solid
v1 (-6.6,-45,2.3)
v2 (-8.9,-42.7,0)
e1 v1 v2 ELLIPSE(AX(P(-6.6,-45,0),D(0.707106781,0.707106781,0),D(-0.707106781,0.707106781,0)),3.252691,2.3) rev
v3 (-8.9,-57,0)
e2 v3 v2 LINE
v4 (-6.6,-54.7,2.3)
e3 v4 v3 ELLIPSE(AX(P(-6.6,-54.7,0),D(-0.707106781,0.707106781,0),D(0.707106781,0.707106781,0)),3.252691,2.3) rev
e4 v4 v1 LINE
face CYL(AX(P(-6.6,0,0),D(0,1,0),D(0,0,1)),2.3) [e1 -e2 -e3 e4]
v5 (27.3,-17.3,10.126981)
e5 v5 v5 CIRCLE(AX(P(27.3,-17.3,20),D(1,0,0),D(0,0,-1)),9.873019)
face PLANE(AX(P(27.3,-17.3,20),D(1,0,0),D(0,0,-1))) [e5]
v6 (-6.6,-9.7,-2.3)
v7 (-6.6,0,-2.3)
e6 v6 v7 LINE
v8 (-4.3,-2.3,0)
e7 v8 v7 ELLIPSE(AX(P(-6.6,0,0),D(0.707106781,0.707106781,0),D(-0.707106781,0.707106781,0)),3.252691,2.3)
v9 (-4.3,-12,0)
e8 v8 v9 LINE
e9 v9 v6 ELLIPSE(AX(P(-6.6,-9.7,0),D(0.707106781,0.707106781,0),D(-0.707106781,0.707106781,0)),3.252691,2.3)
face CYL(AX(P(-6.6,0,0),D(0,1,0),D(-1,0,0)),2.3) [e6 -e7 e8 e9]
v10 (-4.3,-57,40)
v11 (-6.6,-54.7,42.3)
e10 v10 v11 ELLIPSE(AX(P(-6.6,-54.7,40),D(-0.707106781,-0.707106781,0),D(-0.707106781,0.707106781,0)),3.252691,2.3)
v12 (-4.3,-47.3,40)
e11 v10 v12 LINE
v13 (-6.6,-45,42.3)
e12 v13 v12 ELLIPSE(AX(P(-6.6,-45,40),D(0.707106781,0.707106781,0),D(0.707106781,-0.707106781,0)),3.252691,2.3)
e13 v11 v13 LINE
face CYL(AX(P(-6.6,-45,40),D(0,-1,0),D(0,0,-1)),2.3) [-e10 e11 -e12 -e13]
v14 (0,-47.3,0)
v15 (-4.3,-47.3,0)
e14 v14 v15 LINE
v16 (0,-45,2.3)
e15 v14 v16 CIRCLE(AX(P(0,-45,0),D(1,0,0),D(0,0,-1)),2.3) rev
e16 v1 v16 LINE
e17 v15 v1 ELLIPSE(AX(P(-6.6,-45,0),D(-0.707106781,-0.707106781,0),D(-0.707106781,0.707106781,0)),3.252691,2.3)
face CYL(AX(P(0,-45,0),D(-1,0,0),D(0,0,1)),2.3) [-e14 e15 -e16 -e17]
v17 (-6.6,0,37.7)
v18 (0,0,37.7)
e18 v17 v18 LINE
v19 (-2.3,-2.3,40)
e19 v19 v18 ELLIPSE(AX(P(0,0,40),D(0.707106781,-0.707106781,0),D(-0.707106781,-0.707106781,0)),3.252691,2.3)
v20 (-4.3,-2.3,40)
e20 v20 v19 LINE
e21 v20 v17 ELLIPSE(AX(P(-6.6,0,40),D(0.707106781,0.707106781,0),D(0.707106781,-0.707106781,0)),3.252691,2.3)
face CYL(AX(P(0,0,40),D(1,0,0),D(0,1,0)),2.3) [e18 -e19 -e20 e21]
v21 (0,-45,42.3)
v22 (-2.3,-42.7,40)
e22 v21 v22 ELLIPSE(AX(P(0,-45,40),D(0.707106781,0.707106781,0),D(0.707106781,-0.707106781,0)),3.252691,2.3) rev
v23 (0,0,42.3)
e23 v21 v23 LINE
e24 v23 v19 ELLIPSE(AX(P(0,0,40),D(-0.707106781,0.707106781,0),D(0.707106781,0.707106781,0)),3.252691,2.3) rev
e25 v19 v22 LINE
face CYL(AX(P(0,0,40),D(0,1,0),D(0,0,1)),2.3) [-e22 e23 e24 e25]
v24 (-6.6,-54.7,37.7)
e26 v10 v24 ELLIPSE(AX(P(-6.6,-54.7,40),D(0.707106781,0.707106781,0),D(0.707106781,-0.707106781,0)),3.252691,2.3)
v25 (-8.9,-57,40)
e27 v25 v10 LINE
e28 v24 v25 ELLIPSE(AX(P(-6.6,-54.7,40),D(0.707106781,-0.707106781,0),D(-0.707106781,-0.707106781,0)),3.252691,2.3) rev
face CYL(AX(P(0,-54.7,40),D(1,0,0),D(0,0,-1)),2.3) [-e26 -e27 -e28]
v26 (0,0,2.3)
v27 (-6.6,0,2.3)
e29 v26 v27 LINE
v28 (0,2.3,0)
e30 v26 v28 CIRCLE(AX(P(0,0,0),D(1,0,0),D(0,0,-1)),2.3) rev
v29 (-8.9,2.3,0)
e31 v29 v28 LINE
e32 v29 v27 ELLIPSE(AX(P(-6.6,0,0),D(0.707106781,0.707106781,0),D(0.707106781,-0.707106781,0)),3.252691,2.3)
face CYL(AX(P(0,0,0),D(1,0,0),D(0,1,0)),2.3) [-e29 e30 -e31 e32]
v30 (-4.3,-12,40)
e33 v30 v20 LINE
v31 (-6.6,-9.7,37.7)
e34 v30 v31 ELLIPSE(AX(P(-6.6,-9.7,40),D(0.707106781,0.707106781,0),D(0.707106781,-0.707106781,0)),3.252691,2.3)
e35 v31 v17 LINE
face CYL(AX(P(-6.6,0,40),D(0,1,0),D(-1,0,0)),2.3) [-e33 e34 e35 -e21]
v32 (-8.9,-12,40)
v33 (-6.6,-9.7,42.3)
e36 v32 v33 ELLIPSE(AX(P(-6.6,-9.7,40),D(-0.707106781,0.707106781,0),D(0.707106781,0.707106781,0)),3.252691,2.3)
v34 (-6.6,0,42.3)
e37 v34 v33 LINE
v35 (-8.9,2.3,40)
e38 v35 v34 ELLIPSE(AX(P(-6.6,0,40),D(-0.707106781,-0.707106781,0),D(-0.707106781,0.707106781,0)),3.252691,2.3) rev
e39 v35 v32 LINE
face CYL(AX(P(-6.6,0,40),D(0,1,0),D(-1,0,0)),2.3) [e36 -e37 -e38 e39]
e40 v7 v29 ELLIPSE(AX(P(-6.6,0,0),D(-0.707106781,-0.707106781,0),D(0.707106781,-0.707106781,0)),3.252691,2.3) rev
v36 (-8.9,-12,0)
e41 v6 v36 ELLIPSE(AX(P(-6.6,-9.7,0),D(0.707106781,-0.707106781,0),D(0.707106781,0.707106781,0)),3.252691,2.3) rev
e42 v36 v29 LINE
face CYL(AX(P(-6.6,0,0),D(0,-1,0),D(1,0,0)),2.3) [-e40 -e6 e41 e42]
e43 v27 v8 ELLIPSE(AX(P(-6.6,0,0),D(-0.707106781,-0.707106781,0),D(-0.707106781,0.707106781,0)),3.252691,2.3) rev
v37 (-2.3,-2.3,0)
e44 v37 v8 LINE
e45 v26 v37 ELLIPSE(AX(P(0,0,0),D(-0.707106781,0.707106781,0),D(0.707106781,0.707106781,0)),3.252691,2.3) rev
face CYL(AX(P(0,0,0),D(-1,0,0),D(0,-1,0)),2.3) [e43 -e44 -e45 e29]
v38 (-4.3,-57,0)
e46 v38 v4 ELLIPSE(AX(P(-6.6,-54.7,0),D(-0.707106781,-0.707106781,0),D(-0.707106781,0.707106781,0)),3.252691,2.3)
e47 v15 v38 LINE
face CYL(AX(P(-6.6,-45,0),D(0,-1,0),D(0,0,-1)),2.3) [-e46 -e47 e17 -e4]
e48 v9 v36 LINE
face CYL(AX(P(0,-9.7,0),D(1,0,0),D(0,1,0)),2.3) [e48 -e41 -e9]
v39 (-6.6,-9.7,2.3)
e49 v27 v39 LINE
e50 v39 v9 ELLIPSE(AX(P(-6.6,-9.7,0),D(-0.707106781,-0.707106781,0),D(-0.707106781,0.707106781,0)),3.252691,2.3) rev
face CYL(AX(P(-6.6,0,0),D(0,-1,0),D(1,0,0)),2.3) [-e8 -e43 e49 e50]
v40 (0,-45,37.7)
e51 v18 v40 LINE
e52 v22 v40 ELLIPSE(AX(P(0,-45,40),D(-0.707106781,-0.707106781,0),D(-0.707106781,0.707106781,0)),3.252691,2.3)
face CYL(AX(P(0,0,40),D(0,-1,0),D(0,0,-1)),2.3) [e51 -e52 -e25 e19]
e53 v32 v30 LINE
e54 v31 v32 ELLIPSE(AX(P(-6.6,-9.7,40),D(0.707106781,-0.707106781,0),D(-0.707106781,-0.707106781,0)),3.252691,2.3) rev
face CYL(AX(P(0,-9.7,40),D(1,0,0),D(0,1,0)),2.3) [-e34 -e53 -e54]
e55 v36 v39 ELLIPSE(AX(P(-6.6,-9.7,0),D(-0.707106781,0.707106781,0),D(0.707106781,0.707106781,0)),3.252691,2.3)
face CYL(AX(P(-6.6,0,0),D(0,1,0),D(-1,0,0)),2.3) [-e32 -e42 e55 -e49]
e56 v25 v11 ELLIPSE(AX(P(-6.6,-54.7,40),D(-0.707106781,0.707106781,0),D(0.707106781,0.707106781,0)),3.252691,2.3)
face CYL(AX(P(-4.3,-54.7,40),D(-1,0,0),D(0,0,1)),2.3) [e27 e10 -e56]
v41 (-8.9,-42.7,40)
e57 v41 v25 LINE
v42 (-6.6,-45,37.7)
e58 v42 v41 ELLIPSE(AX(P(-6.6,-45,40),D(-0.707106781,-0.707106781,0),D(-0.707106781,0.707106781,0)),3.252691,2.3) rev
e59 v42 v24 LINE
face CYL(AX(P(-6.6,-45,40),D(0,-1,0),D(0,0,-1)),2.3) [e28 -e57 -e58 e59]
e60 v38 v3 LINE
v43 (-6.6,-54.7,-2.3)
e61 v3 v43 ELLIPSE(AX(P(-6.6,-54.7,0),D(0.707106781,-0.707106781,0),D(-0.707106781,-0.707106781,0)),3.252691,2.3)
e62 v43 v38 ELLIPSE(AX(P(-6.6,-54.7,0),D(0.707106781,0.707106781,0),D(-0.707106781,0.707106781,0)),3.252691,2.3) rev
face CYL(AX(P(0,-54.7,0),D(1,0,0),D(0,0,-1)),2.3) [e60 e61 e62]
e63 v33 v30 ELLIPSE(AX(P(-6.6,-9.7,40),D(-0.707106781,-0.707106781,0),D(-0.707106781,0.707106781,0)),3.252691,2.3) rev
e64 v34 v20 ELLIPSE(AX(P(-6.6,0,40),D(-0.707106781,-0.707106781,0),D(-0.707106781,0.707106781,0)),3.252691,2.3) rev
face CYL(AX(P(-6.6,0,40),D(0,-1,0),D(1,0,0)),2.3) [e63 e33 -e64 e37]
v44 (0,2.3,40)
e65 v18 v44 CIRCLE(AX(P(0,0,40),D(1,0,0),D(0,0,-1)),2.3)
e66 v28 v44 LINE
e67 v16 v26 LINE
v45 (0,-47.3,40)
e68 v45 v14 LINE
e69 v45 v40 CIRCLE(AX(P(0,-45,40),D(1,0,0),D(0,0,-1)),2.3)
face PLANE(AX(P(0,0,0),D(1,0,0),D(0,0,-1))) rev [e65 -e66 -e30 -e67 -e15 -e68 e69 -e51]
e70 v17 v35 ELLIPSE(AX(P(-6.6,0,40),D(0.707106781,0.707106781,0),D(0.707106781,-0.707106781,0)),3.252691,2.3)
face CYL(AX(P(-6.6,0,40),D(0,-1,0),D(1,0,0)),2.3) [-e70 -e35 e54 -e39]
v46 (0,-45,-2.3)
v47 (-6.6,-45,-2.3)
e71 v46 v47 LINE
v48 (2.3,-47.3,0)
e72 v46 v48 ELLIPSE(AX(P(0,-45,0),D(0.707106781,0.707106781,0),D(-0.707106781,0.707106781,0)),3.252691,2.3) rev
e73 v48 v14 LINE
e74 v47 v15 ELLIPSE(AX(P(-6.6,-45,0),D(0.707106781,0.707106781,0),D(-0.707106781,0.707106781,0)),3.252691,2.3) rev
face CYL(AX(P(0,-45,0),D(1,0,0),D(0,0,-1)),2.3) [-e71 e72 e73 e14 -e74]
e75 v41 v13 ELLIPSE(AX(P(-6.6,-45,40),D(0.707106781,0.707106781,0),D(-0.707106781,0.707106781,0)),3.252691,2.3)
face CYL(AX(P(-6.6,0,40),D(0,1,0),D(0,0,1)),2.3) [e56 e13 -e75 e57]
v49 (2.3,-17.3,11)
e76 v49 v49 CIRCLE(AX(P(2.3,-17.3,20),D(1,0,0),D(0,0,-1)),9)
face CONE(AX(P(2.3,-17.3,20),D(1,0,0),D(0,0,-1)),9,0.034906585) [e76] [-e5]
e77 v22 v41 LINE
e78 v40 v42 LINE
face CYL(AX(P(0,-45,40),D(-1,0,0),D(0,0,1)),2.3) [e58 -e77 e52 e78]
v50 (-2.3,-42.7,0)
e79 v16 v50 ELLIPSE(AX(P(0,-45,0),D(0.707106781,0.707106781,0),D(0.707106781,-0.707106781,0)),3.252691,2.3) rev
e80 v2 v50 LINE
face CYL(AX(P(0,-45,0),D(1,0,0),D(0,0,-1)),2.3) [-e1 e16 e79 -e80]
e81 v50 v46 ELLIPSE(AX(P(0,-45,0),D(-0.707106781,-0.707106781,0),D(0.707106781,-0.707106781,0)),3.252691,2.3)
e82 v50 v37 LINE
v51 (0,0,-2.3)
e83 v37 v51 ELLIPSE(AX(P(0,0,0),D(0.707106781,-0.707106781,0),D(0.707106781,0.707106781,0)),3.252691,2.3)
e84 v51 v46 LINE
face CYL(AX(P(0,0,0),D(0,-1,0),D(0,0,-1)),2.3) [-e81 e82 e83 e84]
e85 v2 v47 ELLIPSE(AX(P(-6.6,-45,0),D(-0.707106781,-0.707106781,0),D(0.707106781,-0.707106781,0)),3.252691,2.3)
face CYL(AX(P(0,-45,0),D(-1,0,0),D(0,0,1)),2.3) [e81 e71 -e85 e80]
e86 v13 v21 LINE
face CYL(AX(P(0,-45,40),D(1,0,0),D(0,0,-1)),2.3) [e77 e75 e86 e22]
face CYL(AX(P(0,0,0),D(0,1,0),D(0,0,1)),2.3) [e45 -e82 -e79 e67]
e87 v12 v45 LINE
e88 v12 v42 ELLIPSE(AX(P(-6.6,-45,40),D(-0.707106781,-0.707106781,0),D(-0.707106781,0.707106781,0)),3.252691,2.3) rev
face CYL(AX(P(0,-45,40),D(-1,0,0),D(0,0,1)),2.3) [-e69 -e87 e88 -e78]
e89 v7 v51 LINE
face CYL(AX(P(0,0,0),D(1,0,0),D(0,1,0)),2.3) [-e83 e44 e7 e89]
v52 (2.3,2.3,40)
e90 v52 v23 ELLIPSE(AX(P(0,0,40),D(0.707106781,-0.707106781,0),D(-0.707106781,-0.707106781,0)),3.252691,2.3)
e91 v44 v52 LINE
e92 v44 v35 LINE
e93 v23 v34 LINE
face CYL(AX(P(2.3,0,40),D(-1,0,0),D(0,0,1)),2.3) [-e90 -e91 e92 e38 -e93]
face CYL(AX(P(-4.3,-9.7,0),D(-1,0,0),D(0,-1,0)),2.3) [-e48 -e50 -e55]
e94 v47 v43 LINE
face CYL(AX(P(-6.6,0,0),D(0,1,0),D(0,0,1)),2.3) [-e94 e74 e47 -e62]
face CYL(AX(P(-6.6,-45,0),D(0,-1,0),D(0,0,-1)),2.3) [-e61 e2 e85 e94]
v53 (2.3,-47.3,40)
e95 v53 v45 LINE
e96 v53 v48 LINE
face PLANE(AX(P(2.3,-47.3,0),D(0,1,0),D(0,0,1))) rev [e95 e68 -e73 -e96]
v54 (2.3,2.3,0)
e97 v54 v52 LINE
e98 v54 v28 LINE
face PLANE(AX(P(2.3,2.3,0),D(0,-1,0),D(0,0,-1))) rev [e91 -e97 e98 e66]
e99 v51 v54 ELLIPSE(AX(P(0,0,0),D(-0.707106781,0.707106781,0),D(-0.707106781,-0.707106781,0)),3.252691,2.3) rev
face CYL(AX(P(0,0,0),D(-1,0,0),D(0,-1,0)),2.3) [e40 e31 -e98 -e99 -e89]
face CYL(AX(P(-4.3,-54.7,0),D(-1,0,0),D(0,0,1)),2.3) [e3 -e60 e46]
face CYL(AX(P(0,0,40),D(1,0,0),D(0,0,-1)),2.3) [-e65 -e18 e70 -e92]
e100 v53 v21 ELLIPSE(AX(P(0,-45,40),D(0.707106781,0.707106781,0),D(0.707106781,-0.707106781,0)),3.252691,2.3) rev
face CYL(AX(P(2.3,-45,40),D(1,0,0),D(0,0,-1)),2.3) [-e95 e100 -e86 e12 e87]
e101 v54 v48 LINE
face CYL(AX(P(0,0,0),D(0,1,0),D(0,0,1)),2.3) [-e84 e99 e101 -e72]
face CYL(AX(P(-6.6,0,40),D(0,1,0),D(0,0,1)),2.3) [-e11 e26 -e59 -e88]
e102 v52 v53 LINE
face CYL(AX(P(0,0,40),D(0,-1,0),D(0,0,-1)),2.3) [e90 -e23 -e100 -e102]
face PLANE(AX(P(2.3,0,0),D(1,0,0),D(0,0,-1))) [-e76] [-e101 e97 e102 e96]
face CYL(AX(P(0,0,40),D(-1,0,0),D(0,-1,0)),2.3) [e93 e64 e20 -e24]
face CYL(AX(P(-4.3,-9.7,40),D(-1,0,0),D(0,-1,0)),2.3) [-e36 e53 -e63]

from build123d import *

# Parameters (mm, degrees)
EXTRU_MINCE1_DEPTH         = 2.3
CONG_1_R                   = 2.3
ESQUISSE2_W                = 40
ESQUISSE2_H                = 49.6
BOSS_EXTRU_1_DEPTH         = 2.3
R_P_TITION_LIN_AIRE1_COUNT = 2
R_P_TITION_LIN_AIRE1_PITCH = 40
CONG_2_R                   = 2.3
ESQUISSE3_R                = 9
BOSS_EXTRU_2_DEPTH         = 25
BOSS_EXTRU_2_DRAFT         = -2


with BuildPart() as part:
    # Esquisse1 → Extru.-Mince1 (new, symmetric)
    with BuildSketch(Plane.XY):
        Polygon((-4.3, -57), (-4.3, -47.3), (2.3, -47.3), (2.3, 2.3), (-8.9, 2.3), (-8.9, -12), (-4.3, -12), (-4.3, -2.3), (-2.3, -2.3), (-2.3, -42.7), (-8.9, -42.7), (-8.9, -57), align=None)
    extru_mince1 = extrude(amount=EXTRU_MINCE1_DEPTH, both=True)

    # Congé1
    cong_1_edges = [part.edges().sort_by_distance(p)[0] for p in [
        (-6.6, -57, -2.3),
        (-4.3, -52.15, -2.3),
        (-1, -47.3, -2.3),
        (2.3, -22.5, -2.3),
        (-3.3, 2.3, -2.3),
        (-8.9, -4.85, -2.3),
        (-6.6, -12, -2.3),
        (-4.3, -7.15, -2.3),
        (-3.3, -2.3, -2.3),
        (-2.3, -22.5, -2.3),
        (-5.6, -42.7, -2.3),
        (-8.9, -49.85, -2.3),
        (-5.6, -42.7, 2.3),
        (-2.3, -22.5, 2.3),
        (-3.3, -2.3, 2.3),
        (-4.3, -7.15, 2.3),
        (-6.6, -12, 2.3),
        (-8.9, -4.85, 2.3),
        (-3.3, 2.3, 2.3),
        (2.3, -22.5, 2.3),
        (-1, -47.3, 2.3),
        (-4.3, -52.15, 2.3),
        (-6.6, -57, 2.3),
        (-8.9, -49.85, 2.3),
    ]]
    fillet(cong_1_edges, radius=CONG_1_R - 0.0001)  # a hair under: the kernel refuses the full size

    # Esquisse2 → Boss.-Extru.1 (add)
    with BuildSketch(Plane(origin=(0, 0, 0), x_dir=(0, 0, -1), z_dir=(1, 0, 0))):
        with Locations((-20, -22.5)):
            Rectangle(ESQUISSE2_W, ESQUISSE2_H)
    extrude(amount=BOSS_EXTRU_1_DEPTH)

    # Répétition linéaire1: Extru.-Mince1 ×2
    with Locations(*[(0, 0, i * R_P_TITION_LIN_AIRE1_PITCH) for i in range(1, R_P_TITION_LIN_AIRE1_COUNT)]):
        add(extru_mince1)

    # Congé2
    cong_2_edges = [part.edges().sort_by_distance(p)[0] for p in [
        (-5.6, -42.7, 42.3),
        (-2.3, -22.5, 42.3),
        (-3.3, -2.3, 42.3),
        (-4.3, -7.15, 42.3),
        (-6.6, -12, 42.3),
        (-8.9, -4.85, 42.3),
        (-3.3, 2.3, 42.3),
        (2.3, -22.5, 42.3),
        (-1, -47.3, 42.3),
        (-4.3, -52.15, 42.3),
        (-6.6, -57, 42.3),
        (-8.9, -49.85, 42.3),
        (-2.15, -47.3, 37.7),
        (-4.3, -52.15, 37.7),
        (-6.6, -57, 37.7),
        (-8.9, -49.85, 37.7),
        (-5.6, -42.7, 37.7),
        (-2.3, -22.5, 37.7),
        (-3.3, -2.3, 37.7),
        (-4.3, -7.15, 37.7),
        (-6.6, -12, 37.7),
        (-8.9, -4.85, 37.7),
        (-4.45, 2.3, 37.7),
    ]]
    fillet(cong_2_edges, radius=CONG_2_R - 0.0001)  # a hair under: the kernel refuses the full size


with BuildPart() as boss_extru_2_tool:
    # Esquisse3 → Boss.-Extru.2 (with draft: the straight prism first)
    with BuildSketch(Plane(origin=(2.3, 0, 0), x_dir=(0, 0, -1), z_dir=(1, 0, 0))):
        with Locations((-20, -17.3)):
            Circle(ESQUISSE3_R)
    extrude(amount=BOSS_EXTRU_2_DEPTH)
    # Boss.-Extru.2: the draft: its side faces are tilted about the plane it starts from
    boss_extru_2_sides = [boss_extru_2_tool.faces().sort_by_distance(p)[0] for p in [
        (14.8, -17.3, 29),
    ]]
    draft(boss_extru_2_sides, Plane(origin=(2.3, 0, 0), x_dir=(0, 0, -1), z_dir=(1, 0, 0)), BOSS_EXTRU_2_DRAFT)


with BuildPart() as part_1:
    add(part.part)

    # Boss.-Extru.2: add boss_extru_2_tool
    add(boss_extru_2_tool.part)


solid = part_1.part
